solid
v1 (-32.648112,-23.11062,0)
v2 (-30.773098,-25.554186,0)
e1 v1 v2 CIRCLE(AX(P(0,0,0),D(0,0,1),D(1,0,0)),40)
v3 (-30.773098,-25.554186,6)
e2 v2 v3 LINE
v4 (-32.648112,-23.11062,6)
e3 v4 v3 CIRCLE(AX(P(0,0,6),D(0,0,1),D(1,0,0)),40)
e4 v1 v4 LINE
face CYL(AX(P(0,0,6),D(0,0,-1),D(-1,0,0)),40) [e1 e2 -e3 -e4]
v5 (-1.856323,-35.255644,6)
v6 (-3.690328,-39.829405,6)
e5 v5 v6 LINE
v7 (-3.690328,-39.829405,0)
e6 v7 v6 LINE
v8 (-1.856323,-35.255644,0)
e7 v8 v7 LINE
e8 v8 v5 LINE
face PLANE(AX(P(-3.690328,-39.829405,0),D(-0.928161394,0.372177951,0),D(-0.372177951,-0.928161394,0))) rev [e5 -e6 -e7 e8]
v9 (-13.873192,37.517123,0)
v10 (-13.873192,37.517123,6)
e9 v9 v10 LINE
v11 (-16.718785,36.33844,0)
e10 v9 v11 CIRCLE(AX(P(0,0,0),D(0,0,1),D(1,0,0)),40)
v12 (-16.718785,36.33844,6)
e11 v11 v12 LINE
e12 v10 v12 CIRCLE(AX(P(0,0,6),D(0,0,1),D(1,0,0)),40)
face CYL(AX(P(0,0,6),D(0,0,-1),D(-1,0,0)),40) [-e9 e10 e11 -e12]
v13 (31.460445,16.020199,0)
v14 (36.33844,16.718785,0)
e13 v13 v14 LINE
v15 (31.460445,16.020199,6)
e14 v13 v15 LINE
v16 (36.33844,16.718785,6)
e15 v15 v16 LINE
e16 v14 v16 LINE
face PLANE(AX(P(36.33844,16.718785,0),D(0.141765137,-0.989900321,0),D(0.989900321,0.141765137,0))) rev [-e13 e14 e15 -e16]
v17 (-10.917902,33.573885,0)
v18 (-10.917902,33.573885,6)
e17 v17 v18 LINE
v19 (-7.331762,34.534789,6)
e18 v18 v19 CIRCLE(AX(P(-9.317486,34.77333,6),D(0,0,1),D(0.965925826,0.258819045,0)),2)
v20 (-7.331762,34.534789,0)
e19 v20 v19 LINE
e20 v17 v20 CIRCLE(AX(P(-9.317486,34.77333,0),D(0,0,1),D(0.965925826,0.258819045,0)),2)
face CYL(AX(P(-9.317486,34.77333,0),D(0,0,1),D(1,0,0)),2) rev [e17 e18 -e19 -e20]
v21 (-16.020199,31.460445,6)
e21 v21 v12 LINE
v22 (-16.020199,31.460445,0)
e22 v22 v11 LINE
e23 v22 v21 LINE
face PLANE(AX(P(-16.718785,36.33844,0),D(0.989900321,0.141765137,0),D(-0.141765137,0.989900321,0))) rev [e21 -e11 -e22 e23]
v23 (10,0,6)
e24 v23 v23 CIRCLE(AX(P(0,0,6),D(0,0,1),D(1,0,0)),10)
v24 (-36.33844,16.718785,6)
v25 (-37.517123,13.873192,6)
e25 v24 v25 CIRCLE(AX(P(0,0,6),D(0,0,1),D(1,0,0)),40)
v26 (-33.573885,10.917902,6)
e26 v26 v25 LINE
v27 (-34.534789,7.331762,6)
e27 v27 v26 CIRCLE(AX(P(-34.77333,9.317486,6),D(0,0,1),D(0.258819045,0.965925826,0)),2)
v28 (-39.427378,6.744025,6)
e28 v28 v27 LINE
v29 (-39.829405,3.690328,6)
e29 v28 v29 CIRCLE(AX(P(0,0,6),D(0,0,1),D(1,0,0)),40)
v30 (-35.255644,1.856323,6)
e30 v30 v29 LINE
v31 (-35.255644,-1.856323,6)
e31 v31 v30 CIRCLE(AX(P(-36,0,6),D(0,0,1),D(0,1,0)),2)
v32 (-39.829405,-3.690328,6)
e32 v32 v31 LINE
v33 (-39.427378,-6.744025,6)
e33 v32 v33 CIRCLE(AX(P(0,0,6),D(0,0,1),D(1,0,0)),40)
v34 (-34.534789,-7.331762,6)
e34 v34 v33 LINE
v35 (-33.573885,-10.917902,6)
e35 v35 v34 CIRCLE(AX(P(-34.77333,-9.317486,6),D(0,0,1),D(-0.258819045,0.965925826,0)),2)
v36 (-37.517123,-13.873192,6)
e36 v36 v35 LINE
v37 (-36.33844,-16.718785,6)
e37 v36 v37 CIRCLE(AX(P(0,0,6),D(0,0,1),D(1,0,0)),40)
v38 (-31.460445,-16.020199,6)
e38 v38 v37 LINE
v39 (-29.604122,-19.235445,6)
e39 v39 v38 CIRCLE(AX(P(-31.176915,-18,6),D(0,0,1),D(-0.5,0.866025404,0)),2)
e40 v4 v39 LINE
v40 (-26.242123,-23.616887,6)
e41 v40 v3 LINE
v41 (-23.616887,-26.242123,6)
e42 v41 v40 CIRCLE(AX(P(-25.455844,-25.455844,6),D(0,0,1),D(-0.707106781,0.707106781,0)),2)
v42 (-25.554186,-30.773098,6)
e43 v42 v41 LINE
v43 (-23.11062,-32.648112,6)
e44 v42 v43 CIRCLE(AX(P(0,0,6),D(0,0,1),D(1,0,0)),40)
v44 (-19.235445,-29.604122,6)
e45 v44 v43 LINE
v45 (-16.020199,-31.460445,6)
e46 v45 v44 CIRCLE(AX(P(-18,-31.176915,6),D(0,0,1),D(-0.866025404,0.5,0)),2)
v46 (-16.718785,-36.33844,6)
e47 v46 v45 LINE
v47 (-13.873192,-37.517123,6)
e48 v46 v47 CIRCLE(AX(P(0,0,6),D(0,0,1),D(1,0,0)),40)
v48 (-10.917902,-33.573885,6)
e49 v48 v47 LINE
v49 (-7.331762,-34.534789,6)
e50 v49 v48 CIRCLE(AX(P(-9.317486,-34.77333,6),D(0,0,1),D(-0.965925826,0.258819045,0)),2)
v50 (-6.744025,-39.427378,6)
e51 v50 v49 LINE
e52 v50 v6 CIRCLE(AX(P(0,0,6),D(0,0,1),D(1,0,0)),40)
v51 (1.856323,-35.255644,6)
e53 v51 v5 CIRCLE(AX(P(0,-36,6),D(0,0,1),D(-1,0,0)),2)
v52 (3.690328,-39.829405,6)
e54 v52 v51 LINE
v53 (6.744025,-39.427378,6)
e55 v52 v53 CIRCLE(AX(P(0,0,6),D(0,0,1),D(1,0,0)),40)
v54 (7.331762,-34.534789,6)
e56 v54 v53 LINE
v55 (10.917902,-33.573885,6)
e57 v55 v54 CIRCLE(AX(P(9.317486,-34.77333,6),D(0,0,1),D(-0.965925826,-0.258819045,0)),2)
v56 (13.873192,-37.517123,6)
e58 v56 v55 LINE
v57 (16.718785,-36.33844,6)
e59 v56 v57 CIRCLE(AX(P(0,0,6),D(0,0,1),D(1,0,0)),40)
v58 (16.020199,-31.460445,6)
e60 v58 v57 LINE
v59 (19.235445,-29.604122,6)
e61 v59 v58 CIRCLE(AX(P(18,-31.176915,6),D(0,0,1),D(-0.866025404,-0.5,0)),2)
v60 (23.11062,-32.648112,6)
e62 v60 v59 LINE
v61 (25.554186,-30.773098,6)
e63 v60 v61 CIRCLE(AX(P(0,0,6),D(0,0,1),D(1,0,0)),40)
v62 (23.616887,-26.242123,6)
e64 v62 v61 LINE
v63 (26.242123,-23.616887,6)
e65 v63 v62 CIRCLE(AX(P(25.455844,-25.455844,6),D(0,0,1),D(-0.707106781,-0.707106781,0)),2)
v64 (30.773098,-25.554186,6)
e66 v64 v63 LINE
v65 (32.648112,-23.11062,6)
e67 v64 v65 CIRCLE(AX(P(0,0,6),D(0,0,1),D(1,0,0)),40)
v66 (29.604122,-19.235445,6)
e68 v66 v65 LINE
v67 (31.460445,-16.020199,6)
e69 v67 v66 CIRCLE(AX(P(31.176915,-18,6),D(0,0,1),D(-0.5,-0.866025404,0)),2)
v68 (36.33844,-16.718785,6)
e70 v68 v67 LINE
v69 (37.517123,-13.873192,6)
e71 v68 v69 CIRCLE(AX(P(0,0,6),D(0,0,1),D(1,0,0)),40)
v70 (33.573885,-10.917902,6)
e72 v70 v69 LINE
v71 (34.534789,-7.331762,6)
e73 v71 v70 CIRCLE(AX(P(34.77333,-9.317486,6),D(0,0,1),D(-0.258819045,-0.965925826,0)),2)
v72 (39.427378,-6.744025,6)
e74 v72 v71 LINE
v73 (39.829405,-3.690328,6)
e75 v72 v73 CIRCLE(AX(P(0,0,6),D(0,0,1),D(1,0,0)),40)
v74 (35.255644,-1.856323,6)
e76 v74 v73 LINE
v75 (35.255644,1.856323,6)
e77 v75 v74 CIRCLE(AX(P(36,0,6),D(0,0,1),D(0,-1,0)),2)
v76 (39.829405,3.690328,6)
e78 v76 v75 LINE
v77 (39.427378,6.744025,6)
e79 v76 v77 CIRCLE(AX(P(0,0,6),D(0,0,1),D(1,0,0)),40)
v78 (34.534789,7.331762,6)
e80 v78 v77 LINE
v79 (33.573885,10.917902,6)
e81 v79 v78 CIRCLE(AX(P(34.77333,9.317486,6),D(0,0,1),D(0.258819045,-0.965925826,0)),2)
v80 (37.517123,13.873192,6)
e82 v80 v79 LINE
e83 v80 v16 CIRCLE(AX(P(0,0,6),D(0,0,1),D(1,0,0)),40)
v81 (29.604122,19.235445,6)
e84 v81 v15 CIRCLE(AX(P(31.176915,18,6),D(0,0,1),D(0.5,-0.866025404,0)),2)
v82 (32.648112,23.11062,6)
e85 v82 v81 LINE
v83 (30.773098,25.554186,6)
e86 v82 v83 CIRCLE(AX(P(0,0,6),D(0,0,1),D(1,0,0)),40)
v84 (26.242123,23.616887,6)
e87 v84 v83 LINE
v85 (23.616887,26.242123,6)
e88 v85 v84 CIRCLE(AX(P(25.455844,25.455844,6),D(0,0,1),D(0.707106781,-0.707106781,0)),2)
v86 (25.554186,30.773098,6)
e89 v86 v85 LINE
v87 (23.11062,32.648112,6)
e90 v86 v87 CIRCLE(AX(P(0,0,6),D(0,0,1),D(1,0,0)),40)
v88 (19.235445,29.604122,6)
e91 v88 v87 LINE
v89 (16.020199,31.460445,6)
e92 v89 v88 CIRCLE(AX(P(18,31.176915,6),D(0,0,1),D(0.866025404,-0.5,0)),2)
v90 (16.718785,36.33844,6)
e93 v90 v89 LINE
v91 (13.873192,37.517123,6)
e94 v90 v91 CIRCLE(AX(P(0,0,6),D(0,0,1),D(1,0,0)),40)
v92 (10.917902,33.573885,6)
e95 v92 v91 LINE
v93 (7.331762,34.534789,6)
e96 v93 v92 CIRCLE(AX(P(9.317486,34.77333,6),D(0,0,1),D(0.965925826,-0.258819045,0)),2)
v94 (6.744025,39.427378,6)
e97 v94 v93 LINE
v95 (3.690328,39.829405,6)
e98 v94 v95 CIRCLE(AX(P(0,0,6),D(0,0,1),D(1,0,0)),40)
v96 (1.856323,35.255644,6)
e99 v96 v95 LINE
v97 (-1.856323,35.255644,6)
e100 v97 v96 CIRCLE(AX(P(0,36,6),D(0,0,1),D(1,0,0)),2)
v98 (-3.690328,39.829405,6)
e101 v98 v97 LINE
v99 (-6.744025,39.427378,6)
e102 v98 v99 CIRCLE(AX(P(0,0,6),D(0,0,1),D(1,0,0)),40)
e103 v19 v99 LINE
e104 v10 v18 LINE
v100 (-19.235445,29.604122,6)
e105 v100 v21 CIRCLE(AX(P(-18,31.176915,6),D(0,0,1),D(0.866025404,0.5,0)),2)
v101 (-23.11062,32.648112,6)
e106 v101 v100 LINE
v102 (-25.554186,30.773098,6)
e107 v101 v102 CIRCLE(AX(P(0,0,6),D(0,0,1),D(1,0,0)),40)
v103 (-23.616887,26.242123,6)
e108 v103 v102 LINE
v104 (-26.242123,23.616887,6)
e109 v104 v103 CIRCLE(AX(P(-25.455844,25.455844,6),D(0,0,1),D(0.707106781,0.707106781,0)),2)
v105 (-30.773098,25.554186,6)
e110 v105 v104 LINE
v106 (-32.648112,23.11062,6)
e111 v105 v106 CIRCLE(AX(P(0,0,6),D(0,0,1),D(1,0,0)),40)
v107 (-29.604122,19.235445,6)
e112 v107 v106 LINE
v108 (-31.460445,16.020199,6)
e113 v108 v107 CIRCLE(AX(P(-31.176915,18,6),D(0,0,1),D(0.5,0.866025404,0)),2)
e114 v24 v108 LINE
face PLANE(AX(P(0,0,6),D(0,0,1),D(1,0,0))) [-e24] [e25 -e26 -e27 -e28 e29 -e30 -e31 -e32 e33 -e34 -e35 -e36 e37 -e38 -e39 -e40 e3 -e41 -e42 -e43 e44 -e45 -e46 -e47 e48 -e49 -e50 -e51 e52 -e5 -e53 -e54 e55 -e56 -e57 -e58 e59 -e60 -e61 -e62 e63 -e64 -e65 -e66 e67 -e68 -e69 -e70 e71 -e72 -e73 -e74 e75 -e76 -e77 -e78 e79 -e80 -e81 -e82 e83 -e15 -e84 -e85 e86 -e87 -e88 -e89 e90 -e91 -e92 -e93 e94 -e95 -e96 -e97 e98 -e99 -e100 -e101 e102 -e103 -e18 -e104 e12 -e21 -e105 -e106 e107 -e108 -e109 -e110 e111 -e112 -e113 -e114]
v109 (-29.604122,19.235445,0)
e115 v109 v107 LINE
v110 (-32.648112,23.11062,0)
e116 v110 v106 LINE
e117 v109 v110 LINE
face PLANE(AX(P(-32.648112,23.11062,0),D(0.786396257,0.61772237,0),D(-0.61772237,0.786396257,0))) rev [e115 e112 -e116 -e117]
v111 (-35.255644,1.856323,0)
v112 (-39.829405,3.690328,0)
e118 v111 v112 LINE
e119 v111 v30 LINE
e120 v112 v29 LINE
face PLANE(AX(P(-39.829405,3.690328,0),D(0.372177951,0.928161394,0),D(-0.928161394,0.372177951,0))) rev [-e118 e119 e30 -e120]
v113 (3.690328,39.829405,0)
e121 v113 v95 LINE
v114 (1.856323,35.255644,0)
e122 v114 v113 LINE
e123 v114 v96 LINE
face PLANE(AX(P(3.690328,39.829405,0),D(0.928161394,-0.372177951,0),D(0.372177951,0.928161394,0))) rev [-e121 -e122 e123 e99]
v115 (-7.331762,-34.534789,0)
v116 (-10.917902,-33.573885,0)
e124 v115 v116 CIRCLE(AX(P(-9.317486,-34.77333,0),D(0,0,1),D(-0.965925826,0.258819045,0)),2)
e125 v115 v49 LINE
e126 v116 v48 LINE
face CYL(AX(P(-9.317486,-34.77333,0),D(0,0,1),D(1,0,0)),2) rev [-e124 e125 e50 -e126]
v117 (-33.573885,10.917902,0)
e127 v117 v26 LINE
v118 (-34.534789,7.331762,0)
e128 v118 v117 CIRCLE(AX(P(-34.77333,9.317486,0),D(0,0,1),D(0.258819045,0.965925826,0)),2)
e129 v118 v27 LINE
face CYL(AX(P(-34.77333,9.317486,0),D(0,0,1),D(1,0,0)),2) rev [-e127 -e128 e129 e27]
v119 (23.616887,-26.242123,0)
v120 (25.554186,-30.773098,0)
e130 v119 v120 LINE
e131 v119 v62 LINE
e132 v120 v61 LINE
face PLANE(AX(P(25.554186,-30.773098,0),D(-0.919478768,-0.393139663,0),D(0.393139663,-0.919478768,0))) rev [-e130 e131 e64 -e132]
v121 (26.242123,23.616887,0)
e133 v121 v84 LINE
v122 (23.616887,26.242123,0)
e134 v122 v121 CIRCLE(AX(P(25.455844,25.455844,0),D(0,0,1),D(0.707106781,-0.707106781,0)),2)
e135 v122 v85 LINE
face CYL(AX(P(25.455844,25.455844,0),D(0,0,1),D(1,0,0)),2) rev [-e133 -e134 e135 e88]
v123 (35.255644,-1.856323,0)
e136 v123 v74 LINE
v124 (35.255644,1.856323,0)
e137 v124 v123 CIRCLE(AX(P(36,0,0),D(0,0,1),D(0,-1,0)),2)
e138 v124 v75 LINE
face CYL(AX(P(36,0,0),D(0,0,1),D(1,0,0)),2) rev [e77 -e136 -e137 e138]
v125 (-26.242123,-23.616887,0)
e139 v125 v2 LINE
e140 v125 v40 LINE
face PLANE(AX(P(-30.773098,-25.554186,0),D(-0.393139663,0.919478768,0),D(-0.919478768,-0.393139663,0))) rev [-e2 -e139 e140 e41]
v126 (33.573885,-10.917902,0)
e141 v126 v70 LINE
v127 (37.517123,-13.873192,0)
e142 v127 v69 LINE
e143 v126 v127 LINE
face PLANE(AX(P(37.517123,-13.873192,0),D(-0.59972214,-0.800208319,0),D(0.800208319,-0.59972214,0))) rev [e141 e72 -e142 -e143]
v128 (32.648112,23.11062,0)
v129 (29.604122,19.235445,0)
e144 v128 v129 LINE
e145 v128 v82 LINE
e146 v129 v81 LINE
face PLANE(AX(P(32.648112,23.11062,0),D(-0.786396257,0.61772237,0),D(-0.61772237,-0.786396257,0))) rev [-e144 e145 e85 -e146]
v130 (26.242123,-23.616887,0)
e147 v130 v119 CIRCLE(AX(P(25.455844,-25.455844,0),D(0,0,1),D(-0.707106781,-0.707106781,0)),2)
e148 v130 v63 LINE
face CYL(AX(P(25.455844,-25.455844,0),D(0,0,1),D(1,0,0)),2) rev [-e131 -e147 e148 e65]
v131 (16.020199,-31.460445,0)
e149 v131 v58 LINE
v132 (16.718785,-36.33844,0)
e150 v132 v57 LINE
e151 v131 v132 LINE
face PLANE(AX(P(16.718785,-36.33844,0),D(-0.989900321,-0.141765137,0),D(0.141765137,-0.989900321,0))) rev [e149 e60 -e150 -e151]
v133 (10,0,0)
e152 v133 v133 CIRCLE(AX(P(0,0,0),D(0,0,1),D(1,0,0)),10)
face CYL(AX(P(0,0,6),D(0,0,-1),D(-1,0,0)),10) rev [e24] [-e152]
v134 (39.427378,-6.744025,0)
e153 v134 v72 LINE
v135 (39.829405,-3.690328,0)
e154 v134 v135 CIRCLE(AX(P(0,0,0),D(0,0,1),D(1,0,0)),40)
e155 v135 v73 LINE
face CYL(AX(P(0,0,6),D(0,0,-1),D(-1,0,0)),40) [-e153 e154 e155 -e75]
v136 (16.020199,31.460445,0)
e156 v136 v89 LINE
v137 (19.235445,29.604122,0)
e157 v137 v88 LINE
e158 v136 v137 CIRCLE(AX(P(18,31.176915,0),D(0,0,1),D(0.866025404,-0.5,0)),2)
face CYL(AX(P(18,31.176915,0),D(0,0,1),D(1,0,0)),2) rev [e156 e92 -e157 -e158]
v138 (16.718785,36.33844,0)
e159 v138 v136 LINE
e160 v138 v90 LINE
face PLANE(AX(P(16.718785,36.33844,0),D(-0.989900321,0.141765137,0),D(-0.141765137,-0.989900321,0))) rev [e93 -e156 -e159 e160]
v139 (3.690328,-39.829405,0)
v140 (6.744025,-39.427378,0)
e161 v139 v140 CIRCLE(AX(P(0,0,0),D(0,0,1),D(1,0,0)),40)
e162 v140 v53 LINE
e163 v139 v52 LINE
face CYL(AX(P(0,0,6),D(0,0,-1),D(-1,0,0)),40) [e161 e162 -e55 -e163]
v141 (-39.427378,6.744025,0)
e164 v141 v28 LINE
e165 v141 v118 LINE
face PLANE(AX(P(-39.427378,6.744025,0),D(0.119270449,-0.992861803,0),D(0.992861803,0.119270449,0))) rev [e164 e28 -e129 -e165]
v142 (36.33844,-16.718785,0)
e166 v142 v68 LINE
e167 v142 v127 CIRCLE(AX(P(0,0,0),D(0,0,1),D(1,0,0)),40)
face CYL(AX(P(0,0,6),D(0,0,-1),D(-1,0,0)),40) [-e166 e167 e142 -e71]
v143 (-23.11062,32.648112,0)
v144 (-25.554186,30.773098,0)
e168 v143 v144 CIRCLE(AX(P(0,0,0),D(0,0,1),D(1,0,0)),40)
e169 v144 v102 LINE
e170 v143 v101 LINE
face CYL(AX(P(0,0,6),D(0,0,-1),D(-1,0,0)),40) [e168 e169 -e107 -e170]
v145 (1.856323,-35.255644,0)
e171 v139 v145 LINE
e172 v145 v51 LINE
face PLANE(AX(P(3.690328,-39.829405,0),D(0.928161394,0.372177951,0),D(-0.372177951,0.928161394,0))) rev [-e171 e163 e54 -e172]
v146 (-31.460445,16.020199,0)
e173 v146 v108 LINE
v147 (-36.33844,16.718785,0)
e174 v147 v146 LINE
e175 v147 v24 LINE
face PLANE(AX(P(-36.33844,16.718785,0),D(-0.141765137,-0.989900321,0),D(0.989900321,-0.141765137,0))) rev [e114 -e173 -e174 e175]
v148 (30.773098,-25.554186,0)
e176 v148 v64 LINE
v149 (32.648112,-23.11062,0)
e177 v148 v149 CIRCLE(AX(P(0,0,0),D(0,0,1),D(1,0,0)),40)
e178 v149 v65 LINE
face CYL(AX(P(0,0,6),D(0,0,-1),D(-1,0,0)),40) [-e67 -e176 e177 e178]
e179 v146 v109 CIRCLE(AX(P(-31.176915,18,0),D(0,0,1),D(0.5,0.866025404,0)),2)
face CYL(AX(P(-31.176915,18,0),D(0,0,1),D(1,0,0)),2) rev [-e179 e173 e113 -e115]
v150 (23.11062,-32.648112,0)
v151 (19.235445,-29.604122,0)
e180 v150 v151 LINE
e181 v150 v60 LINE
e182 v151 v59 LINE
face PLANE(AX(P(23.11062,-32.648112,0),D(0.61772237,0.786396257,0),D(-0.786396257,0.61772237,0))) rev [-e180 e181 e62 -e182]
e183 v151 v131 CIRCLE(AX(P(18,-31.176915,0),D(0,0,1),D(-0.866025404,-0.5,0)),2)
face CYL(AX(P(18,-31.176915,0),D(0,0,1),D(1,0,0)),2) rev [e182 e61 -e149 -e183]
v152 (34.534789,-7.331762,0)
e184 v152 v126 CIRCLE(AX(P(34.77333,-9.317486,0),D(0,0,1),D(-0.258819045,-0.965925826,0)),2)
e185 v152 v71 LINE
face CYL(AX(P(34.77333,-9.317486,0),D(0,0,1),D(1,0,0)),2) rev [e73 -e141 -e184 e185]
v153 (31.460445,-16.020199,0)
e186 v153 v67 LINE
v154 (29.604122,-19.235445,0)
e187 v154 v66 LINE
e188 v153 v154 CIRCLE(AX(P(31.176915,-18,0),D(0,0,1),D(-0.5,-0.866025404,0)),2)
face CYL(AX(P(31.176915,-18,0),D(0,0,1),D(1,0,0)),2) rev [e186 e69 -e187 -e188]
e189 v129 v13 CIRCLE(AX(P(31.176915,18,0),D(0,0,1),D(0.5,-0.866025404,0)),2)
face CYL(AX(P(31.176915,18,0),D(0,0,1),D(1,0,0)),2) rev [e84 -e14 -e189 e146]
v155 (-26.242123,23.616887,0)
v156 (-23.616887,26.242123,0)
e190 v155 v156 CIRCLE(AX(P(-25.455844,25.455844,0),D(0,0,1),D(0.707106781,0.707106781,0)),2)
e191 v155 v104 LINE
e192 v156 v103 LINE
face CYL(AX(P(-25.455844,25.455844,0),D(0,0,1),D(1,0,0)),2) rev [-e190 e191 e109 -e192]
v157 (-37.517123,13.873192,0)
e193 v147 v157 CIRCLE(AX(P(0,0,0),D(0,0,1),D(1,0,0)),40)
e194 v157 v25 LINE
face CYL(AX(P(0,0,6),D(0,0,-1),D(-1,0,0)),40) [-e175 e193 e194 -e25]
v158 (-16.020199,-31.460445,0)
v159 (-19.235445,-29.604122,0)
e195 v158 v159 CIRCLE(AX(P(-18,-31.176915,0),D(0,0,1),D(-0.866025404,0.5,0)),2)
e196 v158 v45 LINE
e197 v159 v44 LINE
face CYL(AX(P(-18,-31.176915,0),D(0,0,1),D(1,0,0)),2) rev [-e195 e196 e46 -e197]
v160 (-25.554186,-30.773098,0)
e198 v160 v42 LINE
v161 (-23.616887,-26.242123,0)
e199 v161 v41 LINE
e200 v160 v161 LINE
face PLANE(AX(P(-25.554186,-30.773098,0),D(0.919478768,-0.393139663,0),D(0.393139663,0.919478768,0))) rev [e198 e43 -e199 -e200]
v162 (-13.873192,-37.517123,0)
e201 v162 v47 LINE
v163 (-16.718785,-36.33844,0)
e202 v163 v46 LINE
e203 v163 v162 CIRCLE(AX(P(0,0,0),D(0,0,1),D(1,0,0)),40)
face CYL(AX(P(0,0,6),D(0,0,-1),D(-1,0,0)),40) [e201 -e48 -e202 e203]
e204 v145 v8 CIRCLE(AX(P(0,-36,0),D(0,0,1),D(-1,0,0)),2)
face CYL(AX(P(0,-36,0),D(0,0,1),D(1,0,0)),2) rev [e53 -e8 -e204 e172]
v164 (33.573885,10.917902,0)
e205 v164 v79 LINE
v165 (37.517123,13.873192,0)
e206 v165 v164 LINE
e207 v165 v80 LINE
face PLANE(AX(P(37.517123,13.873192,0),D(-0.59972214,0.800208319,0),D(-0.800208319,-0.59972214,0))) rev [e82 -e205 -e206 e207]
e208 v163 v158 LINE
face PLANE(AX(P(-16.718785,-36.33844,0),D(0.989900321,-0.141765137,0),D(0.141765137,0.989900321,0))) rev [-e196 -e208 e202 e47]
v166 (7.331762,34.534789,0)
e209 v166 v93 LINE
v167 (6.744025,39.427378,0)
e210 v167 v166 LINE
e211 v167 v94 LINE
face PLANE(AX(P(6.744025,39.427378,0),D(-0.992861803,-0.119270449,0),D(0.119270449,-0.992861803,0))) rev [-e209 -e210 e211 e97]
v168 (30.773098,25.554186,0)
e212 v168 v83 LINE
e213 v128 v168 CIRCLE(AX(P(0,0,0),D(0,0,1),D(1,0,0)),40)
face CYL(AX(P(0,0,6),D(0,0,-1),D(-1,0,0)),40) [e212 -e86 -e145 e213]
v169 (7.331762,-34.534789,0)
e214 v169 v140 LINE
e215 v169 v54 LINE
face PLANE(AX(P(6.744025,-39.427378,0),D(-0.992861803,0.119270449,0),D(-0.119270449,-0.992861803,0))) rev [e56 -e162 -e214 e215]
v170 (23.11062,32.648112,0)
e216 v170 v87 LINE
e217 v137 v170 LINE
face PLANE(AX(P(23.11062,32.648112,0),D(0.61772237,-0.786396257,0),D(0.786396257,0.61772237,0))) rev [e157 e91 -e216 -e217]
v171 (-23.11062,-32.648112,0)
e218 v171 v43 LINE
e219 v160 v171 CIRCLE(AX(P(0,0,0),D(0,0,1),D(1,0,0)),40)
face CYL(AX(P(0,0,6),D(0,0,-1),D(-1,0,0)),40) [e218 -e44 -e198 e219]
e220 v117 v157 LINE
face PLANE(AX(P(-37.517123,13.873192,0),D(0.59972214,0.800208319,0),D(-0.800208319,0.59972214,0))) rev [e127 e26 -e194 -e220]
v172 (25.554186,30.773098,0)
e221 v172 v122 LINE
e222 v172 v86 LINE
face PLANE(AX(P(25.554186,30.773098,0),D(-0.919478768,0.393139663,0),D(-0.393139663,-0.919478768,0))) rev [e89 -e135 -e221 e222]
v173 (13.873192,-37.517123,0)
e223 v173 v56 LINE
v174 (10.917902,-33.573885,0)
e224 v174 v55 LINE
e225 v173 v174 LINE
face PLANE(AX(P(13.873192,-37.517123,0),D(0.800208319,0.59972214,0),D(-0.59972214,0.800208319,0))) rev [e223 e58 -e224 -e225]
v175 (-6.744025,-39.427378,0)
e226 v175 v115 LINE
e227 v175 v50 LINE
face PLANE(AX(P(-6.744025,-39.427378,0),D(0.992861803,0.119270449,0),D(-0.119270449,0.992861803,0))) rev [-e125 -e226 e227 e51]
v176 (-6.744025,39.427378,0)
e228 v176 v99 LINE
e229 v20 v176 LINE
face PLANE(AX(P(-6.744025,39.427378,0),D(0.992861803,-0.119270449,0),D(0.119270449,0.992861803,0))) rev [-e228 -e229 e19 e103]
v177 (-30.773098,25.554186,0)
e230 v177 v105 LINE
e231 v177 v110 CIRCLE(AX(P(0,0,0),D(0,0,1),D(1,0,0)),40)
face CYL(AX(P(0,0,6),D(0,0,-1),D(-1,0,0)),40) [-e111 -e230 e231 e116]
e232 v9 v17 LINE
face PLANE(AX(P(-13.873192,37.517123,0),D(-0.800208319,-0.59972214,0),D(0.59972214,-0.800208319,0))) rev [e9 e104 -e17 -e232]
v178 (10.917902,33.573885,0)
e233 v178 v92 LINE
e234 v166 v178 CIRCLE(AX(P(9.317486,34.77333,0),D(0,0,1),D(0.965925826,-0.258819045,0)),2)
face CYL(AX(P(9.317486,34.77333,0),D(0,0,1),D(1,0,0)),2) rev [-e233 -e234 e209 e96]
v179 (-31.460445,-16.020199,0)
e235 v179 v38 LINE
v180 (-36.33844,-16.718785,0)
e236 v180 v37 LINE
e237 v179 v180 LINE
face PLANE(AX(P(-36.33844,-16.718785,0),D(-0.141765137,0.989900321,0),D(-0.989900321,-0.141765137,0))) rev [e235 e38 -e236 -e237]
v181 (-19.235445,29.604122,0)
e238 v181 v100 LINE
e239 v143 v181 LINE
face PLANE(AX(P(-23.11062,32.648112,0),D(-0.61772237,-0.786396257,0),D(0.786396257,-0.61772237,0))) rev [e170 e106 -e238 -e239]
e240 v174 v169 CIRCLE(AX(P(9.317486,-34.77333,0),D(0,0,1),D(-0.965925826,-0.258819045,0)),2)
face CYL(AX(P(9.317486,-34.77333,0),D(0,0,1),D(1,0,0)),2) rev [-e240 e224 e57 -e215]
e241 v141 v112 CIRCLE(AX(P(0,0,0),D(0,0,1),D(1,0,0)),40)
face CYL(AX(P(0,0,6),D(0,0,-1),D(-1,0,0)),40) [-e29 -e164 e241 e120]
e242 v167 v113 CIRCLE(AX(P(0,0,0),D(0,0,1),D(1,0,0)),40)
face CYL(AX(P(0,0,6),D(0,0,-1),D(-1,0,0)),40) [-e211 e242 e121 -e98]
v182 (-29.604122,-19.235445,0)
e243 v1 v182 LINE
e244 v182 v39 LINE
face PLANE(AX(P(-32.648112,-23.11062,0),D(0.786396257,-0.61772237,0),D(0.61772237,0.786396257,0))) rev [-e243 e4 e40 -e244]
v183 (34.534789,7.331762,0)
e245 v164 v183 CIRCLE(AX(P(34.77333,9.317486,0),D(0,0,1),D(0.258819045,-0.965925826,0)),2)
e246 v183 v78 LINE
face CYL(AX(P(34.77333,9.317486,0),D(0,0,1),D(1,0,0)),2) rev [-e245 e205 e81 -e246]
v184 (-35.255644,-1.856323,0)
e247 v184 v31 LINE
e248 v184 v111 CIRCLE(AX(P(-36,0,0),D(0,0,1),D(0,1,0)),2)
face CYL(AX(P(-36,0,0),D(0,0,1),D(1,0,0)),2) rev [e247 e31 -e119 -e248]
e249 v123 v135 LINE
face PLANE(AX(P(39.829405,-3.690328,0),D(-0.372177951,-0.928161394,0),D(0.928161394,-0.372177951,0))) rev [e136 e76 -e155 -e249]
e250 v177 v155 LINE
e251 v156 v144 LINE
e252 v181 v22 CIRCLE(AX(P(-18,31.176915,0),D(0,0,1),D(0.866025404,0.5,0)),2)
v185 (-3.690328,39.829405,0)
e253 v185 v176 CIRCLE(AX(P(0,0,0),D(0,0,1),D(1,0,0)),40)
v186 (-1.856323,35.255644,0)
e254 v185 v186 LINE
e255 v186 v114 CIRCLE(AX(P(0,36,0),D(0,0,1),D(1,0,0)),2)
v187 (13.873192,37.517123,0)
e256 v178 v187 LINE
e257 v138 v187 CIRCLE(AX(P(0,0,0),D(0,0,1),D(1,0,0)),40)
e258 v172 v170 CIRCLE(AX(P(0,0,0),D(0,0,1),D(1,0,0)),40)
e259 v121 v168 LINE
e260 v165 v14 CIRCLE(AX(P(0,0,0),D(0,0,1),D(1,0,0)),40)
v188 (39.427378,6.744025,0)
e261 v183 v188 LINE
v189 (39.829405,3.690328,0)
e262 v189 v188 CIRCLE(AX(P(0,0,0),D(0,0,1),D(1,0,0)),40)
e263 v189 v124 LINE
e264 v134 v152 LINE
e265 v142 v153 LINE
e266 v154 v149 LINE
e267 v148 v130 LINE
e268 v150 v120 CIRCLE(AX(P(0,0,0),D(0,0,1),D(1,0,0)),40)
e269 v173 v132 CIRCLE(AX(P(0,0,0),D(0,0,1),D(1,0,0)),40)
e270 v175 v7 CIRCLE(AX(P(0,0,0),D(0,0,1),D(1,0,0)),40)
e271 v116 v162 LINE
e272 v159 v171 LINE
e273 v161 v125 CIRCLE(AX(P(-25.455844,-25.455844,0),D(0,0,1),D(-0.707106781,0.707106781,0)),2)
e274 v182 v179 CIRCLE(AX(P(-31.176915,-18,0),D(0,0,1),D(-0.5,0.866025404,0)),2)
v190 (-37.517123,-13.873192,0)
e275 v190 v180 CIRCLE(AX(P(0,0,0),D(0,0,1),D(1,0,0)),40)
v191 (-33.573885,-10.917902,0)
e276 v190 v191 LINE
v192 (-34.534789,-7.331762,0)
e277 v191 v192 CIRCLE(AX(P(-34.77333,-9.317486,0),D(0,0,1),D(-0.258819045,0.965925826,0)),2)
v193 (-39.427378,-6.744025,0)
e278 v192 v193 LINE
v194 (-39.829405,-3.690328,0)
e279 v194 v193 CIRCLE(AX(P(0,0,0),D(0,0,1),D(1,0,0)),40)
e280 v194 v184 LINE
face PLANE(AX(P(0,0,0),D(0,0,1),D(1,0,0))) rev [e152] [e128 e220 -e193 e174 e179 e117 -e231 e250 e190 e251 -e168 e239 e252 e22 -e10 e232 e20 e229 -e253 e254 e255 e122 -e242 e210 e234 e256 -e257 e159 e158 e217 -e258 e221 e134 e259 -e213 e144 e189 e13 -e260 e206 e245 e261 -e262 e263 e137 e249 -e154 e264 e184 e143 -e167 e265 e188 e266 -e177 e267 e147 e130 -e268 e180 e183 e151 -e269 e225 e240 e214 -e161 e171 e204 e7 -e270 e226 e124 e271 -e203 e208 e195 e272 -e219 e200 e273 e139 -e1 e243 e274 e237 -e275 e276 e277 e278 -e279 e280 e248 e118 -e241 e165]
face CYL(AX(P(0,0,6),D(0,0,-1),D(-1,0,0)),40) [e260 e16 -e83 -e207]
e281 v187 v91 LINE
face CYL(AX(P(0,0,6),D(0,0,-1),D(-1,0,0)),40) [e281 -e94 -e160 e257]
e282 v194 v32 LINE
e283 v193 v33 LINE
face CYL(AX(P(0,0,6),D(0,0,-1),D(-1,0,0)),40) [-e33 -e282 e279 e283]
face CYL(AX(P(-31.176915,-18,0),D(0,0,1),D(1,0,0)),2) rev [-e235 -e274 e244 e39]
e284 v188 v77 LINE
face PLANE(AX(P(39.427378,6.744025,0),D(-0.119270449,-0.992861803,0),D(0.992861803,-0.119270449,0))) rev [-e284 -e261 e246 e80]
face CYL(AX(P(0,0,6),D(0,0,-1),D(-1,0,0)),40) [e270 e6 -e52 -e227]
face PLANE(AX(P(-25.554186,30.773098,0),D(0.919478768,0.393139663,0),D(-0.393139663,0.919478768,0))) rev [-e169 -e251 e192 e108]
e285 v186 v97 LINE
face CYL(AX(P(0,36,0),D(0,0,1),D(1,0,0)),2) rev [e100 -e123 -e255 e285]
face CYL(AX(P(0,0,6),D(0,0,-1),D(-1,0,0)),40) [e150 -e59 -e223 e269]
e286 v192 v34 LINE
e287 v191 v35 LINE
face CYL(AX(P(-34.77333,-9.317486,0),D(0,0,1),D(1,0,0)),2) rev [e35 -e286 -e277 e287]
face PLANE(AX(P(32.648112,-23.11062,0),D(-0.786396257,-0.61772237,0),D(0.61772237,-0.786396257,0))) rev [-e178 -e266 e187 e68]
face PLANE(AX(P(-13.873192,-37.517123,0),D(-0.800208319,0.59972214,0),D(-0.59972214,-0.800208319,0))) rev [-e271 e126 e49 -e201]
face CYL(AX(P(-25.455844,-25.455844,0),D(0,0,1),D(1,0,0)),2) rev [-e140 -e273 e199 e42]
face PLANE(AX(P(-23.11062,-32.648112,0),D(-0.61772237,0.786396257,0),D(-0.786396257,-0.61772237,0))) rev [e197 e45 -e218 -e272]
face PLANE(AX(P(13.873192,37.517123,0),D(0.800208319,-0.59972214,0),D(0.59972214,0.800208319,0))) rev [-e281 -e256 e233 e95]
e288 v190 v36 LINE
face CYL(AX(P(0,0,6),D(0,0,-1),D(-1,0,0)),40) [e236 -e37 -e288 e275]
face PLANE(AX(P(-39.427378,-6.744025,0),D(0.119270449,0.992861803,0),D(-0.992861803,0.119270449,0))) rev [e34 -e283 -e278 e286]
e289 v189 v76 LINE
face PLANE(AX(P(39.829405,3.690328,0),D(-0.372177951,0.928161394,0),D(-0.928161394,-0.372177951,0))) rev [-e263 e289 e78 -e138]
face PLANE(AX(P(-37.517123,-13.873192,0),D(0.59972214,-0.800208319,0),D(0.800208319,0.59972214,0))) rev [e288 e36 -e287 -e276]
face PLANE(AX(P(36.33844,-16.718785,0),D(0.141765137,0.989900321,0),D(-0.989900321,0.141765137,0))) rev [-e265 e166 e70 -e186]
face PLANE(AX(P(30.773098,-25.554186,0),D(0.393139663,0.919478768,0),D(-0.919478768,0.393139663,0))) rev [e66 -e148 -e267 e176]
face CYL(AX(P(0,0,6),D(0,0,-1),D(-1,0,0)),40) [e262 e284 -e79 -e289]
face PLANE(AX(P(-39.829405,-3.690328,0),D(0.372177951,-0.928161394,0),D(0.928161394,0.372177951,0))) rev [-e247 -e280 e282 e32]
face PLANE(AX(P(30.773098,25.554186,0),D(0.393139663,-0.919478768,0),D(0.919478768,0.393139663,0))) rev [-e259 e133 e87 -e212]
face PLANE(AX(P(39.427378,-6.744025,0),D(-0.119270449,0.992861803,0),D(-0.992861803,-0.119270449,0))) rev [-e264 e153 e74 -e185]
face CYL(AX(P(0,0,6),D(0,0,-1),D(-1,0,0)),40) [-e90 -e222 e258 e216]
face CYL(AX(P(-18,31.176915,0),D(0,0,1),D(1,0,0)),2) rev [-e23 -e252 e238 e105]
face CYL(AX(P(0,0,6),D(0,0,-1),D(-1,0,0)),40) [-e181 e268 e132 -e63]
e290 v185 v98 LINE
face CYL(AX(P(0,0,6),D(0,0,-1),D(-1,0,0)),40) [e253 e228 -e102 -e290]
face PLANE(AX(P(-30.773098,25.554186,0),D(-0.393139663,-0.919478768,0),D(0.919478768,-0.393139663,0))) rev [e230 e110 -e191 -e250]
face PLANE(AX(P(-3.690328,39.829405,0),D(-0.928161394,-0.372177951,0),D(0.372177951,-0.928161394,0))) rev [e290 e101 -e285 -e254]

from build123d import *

# Parameters (mm, degrees)
SKETCH1_R           = 40
SKETCH1_R_2         = 10
BOSS_EXTRUDE1_DEPTH = 6
CUT_EXTRUDE1_START  = -6
CUT_EXTRUDE1_DEPTH  = 6
CIRPATTERN1_DEPTH   = 6


# Read off the part's stored shape, not the designer's step: CirPattern1
with BuildPart() as part:
    # Sketch1 → Boss-Extrude1 (new body)
    with BuildSketch(Plane.XY):
        Circle(SKETCH1_R)
        Circle(SKETCH1_R_2, mode=Mode.SUBTRACT)
    extrude(amount=BOSS_EXTRUDE1_DEPTH)

    # Sketch2 → Cut-Extrude1 (cut)
    with BuildSketch(Plane.XY.offset(6).offset(CUT_EXTRUDE1_START)):
        with BuildLine():
            Line((-3.690328017, 39.829404705), (-1.856322788, 35.255644098))
            ThreePointArc((-1.856322788, 35.255644098), (0, 34), (1.856322788, 35.255644098))
            Line((1.856322788, 35.255644098), (3.690328017, 39.829404705))
            ThreePointArc((3.690328017, 39.829404705), (0, 40), (-3.690328017, 39.829404705))
        make_face()
    extrude(amount=CUT_EXTRUDE1_DEPTH, mode=Mode.SUBTRACT)

    # CirPattern1 outline → CirPattern1 (cut)
    with BuildSketch(Plane.XY):
        with BuildLine():
            ThreePointArc((-10.917902263, 33.573885466), (-8.799847534, 32.841478094), (-7.331762018, 34.534788848))
            Line((-7.331762018, 34.534788848), (-6.744025354, 39.427377824))
            ThreePointArc((-6.744025354, 39.427377824), (-10.352761804, 38.637033052), (-13.873191632, 37.517123477))
            Line((-13.873191632, 37.517123477), (-10.917902263, 33.573885466))
        make_face()
        with BuildLine():
            Line((10.917902263, 33.573885466), (13.873191632, 37.517123477))
            ThreePointArc((13.873191632, 37.517123477), (10.352761804, 38.637033052), (6.744025354, 39.427377824))
            Line((6.744025354, 39.427377824), (7.331762018, 34.534788848))
            ThreePointArc((7.331762018, 34.534788848), (8.799847534, 32.841478094), (10.917902263, 33.573885466))
        make_face()
        with BuildLine():
            Line((19.235444741, 29.604122022), (23.110620163, 32.648112284))
            ThreePointArc((23.110620163, 32.648112284), (20, 34.641016152), (16.718784541, 36.338440301))
            Line((16.718784541, 36.338440301), (16.020199358, 31.46044481))
            ThreePointArc((16.020199358, 31.46044481), (17, 29.444863729), (19.235444741, 29.604122022))
        make_face()
        with BuildLine():
            Line((26.242123448, 23.616886586), (30.773098123, 25.554186192))
            ThreePointArc((30.773098123, 25.554186192), (28.284271248, 28.284271248), (25.554186192, 30.773098123))
            Line((25.554186192, 30.773098123), (23.616886586, 26.242123448))
            ThreePointArc((23.616886586, 26.242123448), (24.04163056, 24.04163056), (26.242123448, 23.616886586))
        make_face()
        with BuildLine():
            Line((31.46044481, 16.020199358), (36.338440301, 16.718784541))
            ThreePointArc((36.338440301, 16.718784541), (34.641016152, 20), (32.648112284, 23.110620163))
            Line((32.648112284, 23.110620163), (29.604122022, 19.235444741))
            ThreePointArc((29.604122022, 19.235444741), (29.444863729, 17), (31.46044481, 16.020199358))
        make_face()
        with BuildLine():
            Line((34.534788848, 7.331762018), (39.427377824, 6.744025354))
            ThreePointArc((39.427377824, 6.744025354), (38.637033052, 10.352761804), (37.517123477, 13.873191632))
            Line((37.517123477, 13.873191632), (33.573885466, 10.917902263))
            ThreePointArc((33.573885466, 10.917902263), (32.841478094, 8.799847534), (34.534788848, 7.331762018))
        make_face()
        with BuildLine():
            Line((35.255644098, -1.856322788), (39.829404705, -3.690328017))
            ThreePointArc((39.829404705, -3.690328017), (40, 0), (39.829404705, 3.690328017))
            Line((39.829404705, 3.690328017), (35.255644098, 1.856322788))
            ThreePointArc((35.255644098, 1.856322788), (34, 0), (35.255644098, -1.856322788))
        make_face()
        with BuildLine():
            Line((33.573885466, -10.917902263), (37.517123477, -13.873191632))
            ThreePointArc((37.517123477, -13.873191632), (38.637033052, -10.352761804), (39.427377823, -6.744025354))
            Line((39.427377823, -6.744025354), (34.534788848, -7.331762018))
            ThreePointArc((34.534788848, -7.331762018), (32.841478094, -8.799847534), (33.573885466, -10.917902263))
        make_face()
        with BuildLine():
            Line((29.604122022, -19.235444741), (32.648112283, -23.110620163))
            ThreePointArc((32.648112283, -23.110620163), (34.641016152, -20), (36.3384403, -16.718784541))
            Line((36.3384403, -16.718784541), (31.46044481, -16.020199358))
            ThreePointArc((31.46044481, -16.020199358), (29.444863729, -17), (29.604122022, -19.235444741))
        make_face()
        with BuildLine():
            Line((23.616886586, -26.242123448), (25.554186192, -30.773098123))
            ThreePointArc((25.554186192, -30.773098123), (28.284271247, -28.284271247), (30.773098123, -25.554186192))
            Line((30.773098123, -25.554186192), (26.242123448, -23.616886586))
            ThreePointArc((26.242123448, -23.616886586), (24.04163056, -24.04163056), (23.616886586, -26.242123448))
        make_face()
        with BuildLine():
            Line((16.020199358, -31.46044481), (16.718784541, -36.3384403))
            ThreePointArc((16.718784541, -36.3384403), (20, -34.641016151), (23.110620163, -32.648112283))
            Line((23.110620163, -32.648112283), (19.235444741, -29.604122022))
            ThreePointArc((19.235444741, -29.604122022), (17, -29.444863729), (16.020199358, -31.46044481))
        make_face()
        with BuildLine():
            Line((7.331762018, -34.534788848), (6.744025354, -39.427377823))
            ThreePointArc((6.744025354, -39.427377823), (10.352761804, -38.637033051), (13.873191632, -37.517123476))
            Line((13.873191632, -37.517123476), (10.917902263, -33.573885466))
            ThreePointArc((10.917902263, -33.573885466), (8.799847534, -32.841478094), (7.331762018, -34.534788848))
        make_face()
        with BuildLine():
            Line((-1.856322788, -35.255644098), (-3.690328017, -39.829404705))
            ThreePointArc((-3.690328017, -39.829404705), (0, -40), (3.690328017, -39.829404705))
            Line((3.690328017, -39.829404705), (1.856322788, -35.255644098))
            ThreePointArc((1.856322788, -35.255644098), (0, -34), (-1.856322788, -35.255644098))
        make_face()
        with BuildLine():
            Line((-10.917902263, -33.573885466), (-13.873191632, -37.517123476))
            ThreePointArc((-13.873191632, -37.517123476), (-10.352761804, -38.637033051), (-6.744025354, -39.427377823))
            Line((-6.744025354, -39.427377823), (-7.331762018, -34.534788848))
            ThreePointArc((-7.331762018, -34.534788848), (-8.799847534, -32.841478094), (-10.917902263, -33.573885466))
        make_face()
        with BuildLine():
            Line((-19.235444741, -29.604122022), (-23.110620163, -32.648112283))
            ThreePointArc((-23.110620163, -32.648112283), (-20, -34.641016151), (-16.718784541, -36.3384403))
            Line((-16.718784541, -36.3384403), (-16.020199358, -31.46044481))
            ThreePointArc((-16.020199358, -31.46044481), (-17, -29.444863729), (-19.235444741, -29.604122022))
        make_face()
        with BuildLine():
            Line((-26.242123448, -23.616886586), (-30.773098123, -25.554186192))
            ThreePointArc((-30.773098123, -25.554186192), (-28.284271247, -28.284271247), (-25.554186192, -30.773098123))
            Line((-25.554186192, -30.773098123), (-23.616886586, -26.242123448))
            ThreePointArc((-23.616886586, -26.242123448), (-24.04163056, -24.04163056), (-26.242123448, -23.616886586))
        make_face()
        with BuildLine():
            Line((-31.46044481, -16.020199358), (-36.3384403, -16.718784541))
            ThreePointArc((-36.3384403, -16.718784541), (-34.641016152, -20), (-32.648112283, -23.110620163))
            Line((-32.648112283, -23.110620163), (-29.604122022, -19.235444741))
            ThreePointArc((-29.604122022, -19.235444741), (-29.444863729, -17), (-31.46044481, -16.020199358))
        make_face()
        with BuildLine():
            Line((-34.534788848, -7.331762018), (-39.427377823, -6.744025354))
            ThreePointArc((-39.427377823, -6.744025354), (-38.637033052, -10.352761804), (-37.517123477, -13.873191632))
            Line((-37.517123477, -13.873191632), (-33.573885466, -10.917902263))
            ThreePointArc((-33.573885466, -10.917902263), (-32.841478094, -8.799847534), (-34.534788848, -7.331762018))
        make_face()
        with BuildLine():
            Line((-35.255644098, 1.856322788), (-39.829404705, 3.690328017))
            ThreePointArc((-39.829404705, 3.690328017), (-40, 0), (-39.829404705, -3.690328017))
            Line((-39.829404705, -3.690328017), (-35.255644098, -1.856322788))
            ThreePointArc((-35.255644098, -1.856322788), (-34, 0), (-35.255644098, 1.856322788))
        make_face()
        with BuildLine():
            Line((-33.573885466, 10.917902263), (-37.517123477, 13.873191632))
            ThreePointArc((-37.517123477, 13.873191632), (-38.637033052, 10.352761804), (-39.427377824, 6.744025354))
            Line((-39.427377824, 6.744025354), (-34.534788848, 7.331762018))
            ThreePointArc((-34.534788848, 7.331762018), (-32.841478094, 8.799847534), (-33.573885466, 10.917902263))
        make_face()
        with BuildLine():
            Line((-29.604122022, 19.235444741), (-32.648112284, 23.110620163))
            ThreePointArc((-32.648112284, 23.110620163), (-34.641016152, 20), (-36.338440301, 16.718784541))
            Line((-36.338440301, 16.718784541), (-31.46044481, 16.020199358))
            ThreePointArc((-31.46044481, 16.020199358), (-29.444863729, 17), (-29.604122022, 19.235444741))
        make_face()
        with BuildLine():
            Line((-23.616886586, 26.242123448), (-25.554186192, 30.773098123))
            ThreePointArc((-25.554186192, 30.773098123), (-28.284271248, 28.284271248), (-30.773098123, 25.554186192))
            Line((-30.773098123, 25.554186192), (-26.242123448, 23.616886586))
            ThreePointArc((-26.242123448, 23.616886586), (-24.04163056, 24.04163056), (-23.616886586, 26.242123448))
        make_face()
        with BuildLine():
            Line((-16.020199358, 31.46044481), (-16.718784541, 36.338440301))
            ThreePointArc((-16.718784541, 36.338440301), (-20, 34.641016152), (-23.110620163, 32.648112284))
            Line((-23.110620163, 32.648112284), (-19.235444741, 29.604122022))
            ThreePointArc((-19.235444741, 29.604122022), (-17, 29.444863729), (-16.020199358, 31.46044481))
        make_face()
    extrude(amount=CIRPATTERN1_DEPTH, mode=Mode.SUBTRACT)


solid = part.part
